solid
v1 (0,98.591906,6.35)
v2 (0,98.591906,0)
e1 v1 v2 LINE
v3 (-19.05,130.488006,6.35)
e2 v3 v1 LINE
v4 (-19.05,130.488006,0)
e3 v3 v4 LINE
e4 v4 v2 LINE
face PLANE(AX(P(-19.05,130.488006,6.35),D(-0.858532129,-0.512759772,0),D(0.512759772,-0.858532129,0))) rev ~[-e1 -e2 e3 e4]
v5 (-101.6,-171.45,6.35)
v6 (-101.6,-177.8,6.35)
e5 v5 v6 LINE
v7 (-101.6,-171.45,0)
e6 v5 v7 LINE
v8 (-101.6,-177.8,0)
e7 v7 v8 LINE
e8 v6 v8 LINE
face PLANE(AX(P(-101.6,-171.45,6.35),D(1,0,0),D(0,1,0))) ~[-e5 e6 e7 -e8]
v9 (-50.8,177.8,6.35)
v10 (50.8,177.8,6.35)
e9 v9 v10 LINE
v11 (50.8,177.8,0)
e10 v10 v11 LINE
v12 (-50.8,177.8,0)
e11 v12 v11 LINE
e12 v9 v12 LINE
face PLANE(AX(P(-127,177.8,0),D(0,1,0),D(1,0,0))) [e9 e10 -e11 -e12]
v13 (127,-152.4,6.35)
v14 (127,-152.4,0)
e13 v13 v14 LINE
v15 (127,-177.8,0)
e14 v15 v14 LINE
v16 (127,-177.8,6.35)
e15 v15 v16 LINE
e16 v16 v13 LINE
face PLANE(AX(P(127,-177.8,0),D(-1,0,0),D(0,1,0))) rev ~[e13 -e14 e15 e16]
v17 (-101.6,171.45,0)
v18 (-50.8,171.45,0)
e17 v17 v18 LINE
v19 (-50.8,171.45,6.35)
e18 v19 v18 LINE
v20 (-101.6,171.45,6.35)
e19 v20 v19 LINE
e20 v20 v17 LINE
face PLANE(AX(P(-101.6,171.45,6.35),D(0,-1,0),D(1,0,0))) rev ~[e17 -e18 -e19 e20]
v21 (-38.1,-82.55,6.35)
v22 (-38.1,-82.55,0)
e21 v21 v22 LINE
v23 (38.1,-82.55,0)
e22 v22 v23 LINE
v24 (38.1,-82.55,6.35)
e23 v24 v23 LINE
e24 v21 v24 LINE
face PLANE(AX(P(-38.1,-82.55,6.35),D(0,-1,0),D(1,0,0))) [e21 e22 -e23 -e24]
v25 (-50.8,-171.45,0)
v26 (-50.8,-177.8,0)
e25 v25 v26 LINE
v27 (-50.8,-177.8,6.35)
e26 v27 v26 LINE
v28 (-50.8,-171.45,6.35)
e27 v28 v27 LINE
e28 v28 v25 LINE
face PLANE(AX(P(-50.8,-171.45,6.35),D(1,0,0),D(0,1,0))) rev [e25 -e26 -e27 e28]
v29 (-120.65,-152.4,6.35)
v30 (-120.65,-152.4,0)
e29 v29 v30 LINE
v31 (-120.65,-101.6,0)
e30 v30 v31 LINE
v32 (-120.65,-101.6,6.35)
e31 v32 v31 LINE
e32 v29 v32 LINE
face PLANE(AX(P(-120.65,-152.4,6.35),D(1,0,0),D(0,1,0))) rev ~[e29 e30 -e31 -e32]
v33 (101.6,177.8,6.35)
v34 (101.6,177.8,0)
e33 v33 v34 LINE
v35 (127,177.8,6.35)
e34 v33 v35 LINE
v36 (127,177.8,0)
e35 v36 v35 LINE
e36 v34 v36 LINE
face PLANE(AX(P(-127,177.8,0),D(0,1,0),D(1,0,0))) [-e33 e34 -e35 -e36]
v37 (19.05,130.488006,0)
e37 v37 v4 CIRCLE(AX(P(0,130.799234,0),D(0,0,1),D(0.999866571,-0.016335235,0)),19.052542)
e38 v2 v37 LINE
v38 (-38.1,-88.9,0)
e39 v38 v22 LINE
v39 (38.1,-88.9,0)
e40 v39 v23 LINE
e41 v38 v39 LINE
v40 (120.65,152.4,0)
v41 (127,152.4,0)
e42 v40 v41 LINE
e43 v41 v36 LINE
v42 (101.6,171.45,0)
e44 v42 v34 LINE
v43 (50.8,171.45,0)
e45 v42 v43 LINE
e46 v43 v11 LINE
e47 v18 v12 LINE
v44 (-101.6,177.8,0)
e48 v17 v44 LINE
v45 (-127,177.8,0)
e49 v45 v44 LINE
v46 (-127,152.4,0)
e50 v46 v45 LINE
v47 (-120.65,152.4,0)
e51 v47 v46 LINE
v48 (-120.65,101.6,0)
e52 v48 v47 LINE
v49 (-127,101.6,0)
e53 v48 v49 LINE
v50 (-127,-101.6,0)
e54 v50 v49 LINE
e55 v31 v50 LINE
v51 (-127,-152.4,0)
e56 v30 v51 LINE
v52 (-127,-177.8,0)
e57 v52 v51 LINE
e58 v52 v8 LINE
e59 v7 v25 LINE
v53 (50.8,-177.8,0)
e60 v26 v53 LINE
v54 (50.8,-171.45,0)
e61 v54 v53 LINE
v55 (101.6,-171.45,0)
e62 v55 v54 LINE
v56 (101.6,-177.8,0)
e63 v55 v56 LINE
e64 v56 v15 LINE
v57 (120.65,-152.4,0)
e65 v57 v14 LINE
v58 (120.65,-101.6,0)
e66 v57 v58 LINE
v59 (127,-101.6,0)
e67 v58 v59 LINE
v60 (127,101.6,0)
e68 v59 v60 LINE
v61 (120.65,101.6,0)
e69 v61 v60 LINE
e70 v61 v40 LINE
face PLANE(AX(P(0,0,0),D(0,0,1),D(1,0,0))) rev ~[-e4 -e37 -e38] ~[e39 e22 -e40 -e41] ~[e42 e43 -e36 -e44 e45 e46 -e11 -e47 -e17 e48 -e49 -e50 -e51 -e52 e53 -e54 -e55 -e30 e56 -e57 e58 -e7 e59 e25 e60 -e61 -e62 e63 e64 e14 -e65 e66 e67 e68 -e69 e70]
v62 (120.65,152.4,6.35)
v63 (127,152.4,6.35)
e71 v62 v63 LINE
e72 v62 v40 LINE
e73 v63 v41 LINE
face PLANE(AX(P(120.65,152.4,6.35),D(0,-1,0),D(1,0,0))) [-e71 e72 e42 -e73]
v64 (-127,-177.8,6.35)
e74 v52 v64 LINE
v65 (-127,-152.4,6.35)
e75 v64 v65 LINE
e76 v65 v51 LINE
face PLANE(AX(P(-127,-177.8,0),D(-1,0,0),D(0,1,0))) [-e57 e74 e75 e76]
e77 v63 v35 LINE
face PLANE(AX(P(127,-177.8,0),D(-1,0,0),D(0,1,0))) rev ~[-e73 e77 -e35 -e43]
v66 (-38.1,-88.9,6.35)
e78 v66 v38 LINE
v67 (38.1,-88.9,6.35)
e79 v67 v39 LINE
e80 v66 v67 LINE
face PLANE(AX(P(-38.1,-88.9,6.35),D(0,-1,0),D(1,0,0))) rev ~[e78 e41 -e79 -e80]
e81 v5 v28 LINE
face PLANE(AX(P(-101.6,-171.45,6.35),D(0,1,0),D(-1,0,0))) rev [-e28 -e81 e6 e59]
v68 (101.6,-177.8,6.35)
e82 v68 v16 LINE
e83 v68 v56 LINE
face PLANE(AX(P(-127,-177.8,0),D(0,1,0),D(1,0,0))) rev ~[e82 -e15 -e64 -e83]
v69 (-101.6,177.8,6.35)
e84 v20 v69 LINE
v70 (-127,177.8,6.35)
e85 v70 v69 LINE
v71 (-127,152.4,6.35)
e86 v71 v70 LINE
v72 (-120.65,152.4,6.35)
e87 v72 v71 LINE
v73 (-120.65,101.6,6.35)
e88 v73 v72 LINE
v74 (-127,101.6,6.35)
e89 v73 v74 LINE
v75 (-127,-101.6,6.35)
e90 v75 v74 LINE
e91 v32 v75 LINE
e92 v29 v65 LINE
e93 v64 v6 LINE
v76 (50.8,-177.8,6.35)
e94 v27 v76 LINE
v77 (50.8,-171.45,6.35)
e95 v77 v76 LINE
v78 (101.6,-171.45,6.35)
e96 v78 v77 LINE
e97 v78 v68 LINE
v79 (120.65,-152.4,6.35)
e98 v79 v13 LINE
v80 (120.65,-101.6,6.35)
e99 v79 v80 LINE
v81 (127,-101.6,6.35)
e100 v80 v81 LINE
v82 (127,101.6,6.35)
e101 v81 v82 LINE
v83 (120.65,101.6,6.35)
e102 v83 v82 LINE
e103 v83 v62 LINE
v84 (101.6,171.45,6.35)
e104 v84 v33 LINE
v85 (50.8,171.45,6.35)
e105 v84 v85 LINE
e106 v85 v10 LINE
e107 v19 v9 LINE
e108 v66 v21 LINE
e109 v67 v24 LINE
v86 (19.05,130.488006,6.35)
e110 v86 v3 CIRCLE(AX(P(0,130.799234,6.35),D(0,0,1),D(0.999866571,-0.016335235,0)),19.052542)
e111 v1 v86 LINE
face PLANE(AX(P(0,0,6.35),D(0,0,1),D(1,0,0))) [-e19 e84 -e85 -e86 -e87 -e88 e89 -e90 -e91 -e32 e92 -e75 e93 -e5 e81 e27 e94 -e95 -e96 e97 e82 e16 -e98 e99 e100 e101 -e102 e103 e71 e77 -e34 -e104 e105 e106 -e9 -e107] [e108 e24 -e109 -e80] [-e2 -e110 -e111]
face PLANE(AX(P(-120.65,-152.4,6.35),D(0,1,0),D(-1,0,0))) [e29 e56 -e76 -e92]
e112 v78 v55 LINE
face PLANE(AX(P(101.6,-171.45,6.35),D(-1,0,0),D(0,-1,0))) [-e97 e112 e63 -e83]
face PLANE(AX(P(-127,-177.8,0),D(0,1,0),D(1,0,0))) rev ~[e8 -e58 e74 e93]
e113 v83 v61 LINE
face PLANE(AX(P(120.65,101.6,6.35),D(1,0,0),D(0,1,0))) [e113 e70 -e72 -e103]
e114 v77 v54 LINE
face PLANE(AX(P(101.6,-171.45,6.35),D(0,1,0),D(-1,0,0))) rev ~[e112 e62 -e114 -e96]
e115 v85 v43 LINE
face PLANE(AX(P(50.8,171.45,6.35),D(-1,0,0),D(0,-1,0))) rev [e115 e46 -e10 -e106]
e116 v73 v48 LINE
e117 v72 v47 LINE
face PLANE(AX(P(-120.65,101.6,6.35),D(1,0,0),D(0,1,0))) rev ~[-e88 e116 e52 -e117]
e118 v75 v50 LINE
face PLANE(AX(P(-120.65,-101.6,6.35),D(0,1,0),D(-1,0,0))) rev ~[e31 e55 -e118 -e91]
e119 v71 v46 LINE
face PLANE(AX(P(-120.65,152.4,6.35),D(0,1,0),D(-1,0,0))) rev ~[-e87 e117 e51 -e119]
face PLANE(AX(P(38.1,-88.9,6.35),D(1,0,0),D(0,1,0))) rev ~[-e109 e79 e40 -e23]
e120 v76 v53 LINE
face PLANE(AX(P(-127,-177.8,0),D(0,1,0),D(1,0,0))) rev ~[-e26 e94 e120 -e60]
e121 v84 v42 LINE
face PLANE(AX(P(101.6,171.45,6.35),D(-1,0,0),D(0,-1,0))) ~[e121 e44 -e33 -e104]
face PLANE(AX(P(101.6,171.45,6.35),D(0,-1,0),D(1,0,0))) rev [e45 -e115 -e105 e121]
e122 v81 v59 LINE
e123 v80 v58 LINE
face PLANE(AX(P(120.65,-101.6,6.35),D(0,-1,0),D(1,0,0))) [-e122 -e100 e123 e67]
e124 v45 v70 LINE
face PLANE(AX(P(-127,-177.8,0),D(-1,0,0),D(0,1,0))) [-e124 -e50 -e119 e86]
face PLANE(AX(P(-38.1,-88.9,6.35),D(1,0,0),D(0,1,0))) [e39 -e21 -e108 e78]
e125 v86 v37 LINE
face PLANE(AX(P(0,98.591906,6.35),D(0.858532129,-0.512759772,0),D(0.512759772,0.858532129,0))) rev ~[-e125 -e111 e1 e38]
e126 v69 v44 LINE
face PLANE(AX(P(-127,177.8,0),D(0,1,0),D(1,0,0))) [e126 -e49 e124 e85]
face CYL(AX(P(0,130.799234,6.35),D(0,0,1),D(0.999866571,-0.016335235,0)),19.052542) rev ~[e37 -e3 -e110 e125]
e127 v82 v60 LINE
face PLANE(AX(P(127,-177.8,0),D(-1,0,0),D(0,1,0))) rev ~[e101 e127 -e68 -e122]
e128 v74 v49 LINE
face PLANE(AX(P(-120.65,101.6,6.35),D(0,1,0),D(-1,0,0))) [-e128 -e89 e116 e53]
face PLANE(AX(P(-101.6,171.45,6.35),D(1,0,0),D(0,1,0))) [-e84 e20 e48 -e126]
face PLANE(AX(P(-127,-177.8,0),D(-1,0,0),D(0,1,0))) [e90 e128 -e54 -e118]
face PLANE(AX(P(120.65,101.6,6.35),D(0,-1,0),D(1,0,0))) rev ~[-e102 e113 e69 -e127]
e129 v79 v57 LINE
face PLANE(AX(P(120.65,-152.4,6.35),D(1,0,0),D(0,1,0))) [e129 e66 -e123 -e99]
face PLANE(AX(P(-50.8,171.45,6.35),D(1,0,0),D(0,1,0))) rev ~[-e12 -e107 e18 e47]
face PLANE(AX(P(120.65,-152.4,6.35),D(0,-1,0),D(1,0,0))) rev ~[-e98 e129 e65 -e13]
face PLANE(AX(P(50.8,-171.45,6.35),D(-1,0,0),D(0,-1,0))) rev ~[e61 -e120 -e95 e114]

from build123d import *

# Parameters (mm, degrees)
F0_W             = 254
F0_H             = 355.6
F1_DEPTH         = 6.35
F2_W             = 50.8
F2_H             = 6.35
F3_DEPTH         = 6.351
F3_COPIES2_COUNT = 2
F3_COPIES3_COUNT = 2
F3_COPIES3_ANGLE = 90
F3_COPIES4_COUNT = 2
F3_COPIES4_ANGLE = 90
F4_W             = 6.35
F4_H             = 50.8
F5_DEPTH         = 25.4
F6_W             = 76.2
F6_H             = 6.35
F7_DEPTH         = 25.4
F9_DEPTH         = 25.4


# Not quite as in the source:
# - a pattern or mirror of a feature is missing from the dataset's text; its kind, count and spacing are read off the source's solid


with BuildPart() as f1:
    # F0 (on Top) → F1 (new body)
    with BuildSketch(Plane.XY):
        Rectangle(F0_W, F0_H)
    extrude(amount=F1_DEPTH)

    # F2 (on face) → F3 (cut, through all)
    with BuildSketch(Plane.XY.offset(6.35)):
        with Locations((-76.2, 174.625)):
            Rectangle(F2_W, F2_H)
    f3 = extrude(amount=-F3_DEPTH, mode=Mode.SUBTRACT)

    # F3_copies: F3 across plane
    add(f3.mirror(Plane(origin=(0, 0, 0), x_dir=(0, 0, -1), z_dir=(0, -1, 0))), mode=Mode.SUBTRACT)

    # F3_copies1: F3 across plane
    add(f3.mirror(Plane(origin=(0, 0, 0), x_dir=(0, 0, 1), z_dir=(1, 0, 0))), mode=Mode.SUBTRACT)

    # F3_copies2: F3 ×2 about axis
    f3_copies2_axis = Axis((0, 0, 0), (0, 0, 1))
    for i in range(1, F3_COPIES2_COUNT):
        add(f3.rotate(f3_copies2_axis, i * 360 / F3_COPIES2_COUNT), mode=Mode.SUBTRACT)

    # F3_copies3: F3 ×2 about axis
    f3_copies3_axis = Axis((50.8, 0, 0), (0, 0, 1))
    for i in range(1, F3_COPIES3_COUNT):
        add(f3.rotate(f3_copies3_axis, i * F3_COPIES3_ANGLE / (F3_COPIES3_COUNT - 1)), mode=Mode.SUBTRACT)

    # F3_copies4: F3 ×2 about axis
    f3_copies4_axis = Axis((-76.2, 127, 0), (0, 0, 1))
    for i in range(1, F3_COPIES4_COUNT):
        add(f3.rotate(f3_copies4_axis, i * F3_COPIES4_ANGLE / (F3_COPIES4_COUNT - 1)), mode=Mode.SUBTRACT)

    # F4 (on face) → F5 (cut)
    with BuildSketch(Plane.XY.offset(6.35)):
        with Locations((123.825, 127)):
            Rectangle(F4_W, F4_H)
        with Locations((123.825, -127)):
            Rectangle(F4_W, F4_H)
    extrude(amount=-F5_DEPTH, mode=Mode.SUBTRACT)

    # F6 (on face) → F7 (cut)
    with BuildSketch(Plane.XY.offset(6.35)):
        with Locations((0, -85.725)):
            Rectangle(F6_W, F6_H)
    extrude(amount=-F7_DEPTH, mode=Mode.SUBTRACT)

    # F8 (on face) → F9 (cut)
    with BuildSketch(Plane.XY.offset(6.35)):
        with BuildLine():
            Line((0, 98.5919060208), (19.05, 130.4880061596))
            ThreePointArc((19.05, 130.4880061596), (0, 149.8517760723), (-19.05, 130.4880061596))
            Line((-19.05, 130.4880061596), (0, 98.5919060208))
        make_face()
    extrude(amount=-F9_DEPTH, mode=Mode.SUBTRACT)


solid = f1.part
